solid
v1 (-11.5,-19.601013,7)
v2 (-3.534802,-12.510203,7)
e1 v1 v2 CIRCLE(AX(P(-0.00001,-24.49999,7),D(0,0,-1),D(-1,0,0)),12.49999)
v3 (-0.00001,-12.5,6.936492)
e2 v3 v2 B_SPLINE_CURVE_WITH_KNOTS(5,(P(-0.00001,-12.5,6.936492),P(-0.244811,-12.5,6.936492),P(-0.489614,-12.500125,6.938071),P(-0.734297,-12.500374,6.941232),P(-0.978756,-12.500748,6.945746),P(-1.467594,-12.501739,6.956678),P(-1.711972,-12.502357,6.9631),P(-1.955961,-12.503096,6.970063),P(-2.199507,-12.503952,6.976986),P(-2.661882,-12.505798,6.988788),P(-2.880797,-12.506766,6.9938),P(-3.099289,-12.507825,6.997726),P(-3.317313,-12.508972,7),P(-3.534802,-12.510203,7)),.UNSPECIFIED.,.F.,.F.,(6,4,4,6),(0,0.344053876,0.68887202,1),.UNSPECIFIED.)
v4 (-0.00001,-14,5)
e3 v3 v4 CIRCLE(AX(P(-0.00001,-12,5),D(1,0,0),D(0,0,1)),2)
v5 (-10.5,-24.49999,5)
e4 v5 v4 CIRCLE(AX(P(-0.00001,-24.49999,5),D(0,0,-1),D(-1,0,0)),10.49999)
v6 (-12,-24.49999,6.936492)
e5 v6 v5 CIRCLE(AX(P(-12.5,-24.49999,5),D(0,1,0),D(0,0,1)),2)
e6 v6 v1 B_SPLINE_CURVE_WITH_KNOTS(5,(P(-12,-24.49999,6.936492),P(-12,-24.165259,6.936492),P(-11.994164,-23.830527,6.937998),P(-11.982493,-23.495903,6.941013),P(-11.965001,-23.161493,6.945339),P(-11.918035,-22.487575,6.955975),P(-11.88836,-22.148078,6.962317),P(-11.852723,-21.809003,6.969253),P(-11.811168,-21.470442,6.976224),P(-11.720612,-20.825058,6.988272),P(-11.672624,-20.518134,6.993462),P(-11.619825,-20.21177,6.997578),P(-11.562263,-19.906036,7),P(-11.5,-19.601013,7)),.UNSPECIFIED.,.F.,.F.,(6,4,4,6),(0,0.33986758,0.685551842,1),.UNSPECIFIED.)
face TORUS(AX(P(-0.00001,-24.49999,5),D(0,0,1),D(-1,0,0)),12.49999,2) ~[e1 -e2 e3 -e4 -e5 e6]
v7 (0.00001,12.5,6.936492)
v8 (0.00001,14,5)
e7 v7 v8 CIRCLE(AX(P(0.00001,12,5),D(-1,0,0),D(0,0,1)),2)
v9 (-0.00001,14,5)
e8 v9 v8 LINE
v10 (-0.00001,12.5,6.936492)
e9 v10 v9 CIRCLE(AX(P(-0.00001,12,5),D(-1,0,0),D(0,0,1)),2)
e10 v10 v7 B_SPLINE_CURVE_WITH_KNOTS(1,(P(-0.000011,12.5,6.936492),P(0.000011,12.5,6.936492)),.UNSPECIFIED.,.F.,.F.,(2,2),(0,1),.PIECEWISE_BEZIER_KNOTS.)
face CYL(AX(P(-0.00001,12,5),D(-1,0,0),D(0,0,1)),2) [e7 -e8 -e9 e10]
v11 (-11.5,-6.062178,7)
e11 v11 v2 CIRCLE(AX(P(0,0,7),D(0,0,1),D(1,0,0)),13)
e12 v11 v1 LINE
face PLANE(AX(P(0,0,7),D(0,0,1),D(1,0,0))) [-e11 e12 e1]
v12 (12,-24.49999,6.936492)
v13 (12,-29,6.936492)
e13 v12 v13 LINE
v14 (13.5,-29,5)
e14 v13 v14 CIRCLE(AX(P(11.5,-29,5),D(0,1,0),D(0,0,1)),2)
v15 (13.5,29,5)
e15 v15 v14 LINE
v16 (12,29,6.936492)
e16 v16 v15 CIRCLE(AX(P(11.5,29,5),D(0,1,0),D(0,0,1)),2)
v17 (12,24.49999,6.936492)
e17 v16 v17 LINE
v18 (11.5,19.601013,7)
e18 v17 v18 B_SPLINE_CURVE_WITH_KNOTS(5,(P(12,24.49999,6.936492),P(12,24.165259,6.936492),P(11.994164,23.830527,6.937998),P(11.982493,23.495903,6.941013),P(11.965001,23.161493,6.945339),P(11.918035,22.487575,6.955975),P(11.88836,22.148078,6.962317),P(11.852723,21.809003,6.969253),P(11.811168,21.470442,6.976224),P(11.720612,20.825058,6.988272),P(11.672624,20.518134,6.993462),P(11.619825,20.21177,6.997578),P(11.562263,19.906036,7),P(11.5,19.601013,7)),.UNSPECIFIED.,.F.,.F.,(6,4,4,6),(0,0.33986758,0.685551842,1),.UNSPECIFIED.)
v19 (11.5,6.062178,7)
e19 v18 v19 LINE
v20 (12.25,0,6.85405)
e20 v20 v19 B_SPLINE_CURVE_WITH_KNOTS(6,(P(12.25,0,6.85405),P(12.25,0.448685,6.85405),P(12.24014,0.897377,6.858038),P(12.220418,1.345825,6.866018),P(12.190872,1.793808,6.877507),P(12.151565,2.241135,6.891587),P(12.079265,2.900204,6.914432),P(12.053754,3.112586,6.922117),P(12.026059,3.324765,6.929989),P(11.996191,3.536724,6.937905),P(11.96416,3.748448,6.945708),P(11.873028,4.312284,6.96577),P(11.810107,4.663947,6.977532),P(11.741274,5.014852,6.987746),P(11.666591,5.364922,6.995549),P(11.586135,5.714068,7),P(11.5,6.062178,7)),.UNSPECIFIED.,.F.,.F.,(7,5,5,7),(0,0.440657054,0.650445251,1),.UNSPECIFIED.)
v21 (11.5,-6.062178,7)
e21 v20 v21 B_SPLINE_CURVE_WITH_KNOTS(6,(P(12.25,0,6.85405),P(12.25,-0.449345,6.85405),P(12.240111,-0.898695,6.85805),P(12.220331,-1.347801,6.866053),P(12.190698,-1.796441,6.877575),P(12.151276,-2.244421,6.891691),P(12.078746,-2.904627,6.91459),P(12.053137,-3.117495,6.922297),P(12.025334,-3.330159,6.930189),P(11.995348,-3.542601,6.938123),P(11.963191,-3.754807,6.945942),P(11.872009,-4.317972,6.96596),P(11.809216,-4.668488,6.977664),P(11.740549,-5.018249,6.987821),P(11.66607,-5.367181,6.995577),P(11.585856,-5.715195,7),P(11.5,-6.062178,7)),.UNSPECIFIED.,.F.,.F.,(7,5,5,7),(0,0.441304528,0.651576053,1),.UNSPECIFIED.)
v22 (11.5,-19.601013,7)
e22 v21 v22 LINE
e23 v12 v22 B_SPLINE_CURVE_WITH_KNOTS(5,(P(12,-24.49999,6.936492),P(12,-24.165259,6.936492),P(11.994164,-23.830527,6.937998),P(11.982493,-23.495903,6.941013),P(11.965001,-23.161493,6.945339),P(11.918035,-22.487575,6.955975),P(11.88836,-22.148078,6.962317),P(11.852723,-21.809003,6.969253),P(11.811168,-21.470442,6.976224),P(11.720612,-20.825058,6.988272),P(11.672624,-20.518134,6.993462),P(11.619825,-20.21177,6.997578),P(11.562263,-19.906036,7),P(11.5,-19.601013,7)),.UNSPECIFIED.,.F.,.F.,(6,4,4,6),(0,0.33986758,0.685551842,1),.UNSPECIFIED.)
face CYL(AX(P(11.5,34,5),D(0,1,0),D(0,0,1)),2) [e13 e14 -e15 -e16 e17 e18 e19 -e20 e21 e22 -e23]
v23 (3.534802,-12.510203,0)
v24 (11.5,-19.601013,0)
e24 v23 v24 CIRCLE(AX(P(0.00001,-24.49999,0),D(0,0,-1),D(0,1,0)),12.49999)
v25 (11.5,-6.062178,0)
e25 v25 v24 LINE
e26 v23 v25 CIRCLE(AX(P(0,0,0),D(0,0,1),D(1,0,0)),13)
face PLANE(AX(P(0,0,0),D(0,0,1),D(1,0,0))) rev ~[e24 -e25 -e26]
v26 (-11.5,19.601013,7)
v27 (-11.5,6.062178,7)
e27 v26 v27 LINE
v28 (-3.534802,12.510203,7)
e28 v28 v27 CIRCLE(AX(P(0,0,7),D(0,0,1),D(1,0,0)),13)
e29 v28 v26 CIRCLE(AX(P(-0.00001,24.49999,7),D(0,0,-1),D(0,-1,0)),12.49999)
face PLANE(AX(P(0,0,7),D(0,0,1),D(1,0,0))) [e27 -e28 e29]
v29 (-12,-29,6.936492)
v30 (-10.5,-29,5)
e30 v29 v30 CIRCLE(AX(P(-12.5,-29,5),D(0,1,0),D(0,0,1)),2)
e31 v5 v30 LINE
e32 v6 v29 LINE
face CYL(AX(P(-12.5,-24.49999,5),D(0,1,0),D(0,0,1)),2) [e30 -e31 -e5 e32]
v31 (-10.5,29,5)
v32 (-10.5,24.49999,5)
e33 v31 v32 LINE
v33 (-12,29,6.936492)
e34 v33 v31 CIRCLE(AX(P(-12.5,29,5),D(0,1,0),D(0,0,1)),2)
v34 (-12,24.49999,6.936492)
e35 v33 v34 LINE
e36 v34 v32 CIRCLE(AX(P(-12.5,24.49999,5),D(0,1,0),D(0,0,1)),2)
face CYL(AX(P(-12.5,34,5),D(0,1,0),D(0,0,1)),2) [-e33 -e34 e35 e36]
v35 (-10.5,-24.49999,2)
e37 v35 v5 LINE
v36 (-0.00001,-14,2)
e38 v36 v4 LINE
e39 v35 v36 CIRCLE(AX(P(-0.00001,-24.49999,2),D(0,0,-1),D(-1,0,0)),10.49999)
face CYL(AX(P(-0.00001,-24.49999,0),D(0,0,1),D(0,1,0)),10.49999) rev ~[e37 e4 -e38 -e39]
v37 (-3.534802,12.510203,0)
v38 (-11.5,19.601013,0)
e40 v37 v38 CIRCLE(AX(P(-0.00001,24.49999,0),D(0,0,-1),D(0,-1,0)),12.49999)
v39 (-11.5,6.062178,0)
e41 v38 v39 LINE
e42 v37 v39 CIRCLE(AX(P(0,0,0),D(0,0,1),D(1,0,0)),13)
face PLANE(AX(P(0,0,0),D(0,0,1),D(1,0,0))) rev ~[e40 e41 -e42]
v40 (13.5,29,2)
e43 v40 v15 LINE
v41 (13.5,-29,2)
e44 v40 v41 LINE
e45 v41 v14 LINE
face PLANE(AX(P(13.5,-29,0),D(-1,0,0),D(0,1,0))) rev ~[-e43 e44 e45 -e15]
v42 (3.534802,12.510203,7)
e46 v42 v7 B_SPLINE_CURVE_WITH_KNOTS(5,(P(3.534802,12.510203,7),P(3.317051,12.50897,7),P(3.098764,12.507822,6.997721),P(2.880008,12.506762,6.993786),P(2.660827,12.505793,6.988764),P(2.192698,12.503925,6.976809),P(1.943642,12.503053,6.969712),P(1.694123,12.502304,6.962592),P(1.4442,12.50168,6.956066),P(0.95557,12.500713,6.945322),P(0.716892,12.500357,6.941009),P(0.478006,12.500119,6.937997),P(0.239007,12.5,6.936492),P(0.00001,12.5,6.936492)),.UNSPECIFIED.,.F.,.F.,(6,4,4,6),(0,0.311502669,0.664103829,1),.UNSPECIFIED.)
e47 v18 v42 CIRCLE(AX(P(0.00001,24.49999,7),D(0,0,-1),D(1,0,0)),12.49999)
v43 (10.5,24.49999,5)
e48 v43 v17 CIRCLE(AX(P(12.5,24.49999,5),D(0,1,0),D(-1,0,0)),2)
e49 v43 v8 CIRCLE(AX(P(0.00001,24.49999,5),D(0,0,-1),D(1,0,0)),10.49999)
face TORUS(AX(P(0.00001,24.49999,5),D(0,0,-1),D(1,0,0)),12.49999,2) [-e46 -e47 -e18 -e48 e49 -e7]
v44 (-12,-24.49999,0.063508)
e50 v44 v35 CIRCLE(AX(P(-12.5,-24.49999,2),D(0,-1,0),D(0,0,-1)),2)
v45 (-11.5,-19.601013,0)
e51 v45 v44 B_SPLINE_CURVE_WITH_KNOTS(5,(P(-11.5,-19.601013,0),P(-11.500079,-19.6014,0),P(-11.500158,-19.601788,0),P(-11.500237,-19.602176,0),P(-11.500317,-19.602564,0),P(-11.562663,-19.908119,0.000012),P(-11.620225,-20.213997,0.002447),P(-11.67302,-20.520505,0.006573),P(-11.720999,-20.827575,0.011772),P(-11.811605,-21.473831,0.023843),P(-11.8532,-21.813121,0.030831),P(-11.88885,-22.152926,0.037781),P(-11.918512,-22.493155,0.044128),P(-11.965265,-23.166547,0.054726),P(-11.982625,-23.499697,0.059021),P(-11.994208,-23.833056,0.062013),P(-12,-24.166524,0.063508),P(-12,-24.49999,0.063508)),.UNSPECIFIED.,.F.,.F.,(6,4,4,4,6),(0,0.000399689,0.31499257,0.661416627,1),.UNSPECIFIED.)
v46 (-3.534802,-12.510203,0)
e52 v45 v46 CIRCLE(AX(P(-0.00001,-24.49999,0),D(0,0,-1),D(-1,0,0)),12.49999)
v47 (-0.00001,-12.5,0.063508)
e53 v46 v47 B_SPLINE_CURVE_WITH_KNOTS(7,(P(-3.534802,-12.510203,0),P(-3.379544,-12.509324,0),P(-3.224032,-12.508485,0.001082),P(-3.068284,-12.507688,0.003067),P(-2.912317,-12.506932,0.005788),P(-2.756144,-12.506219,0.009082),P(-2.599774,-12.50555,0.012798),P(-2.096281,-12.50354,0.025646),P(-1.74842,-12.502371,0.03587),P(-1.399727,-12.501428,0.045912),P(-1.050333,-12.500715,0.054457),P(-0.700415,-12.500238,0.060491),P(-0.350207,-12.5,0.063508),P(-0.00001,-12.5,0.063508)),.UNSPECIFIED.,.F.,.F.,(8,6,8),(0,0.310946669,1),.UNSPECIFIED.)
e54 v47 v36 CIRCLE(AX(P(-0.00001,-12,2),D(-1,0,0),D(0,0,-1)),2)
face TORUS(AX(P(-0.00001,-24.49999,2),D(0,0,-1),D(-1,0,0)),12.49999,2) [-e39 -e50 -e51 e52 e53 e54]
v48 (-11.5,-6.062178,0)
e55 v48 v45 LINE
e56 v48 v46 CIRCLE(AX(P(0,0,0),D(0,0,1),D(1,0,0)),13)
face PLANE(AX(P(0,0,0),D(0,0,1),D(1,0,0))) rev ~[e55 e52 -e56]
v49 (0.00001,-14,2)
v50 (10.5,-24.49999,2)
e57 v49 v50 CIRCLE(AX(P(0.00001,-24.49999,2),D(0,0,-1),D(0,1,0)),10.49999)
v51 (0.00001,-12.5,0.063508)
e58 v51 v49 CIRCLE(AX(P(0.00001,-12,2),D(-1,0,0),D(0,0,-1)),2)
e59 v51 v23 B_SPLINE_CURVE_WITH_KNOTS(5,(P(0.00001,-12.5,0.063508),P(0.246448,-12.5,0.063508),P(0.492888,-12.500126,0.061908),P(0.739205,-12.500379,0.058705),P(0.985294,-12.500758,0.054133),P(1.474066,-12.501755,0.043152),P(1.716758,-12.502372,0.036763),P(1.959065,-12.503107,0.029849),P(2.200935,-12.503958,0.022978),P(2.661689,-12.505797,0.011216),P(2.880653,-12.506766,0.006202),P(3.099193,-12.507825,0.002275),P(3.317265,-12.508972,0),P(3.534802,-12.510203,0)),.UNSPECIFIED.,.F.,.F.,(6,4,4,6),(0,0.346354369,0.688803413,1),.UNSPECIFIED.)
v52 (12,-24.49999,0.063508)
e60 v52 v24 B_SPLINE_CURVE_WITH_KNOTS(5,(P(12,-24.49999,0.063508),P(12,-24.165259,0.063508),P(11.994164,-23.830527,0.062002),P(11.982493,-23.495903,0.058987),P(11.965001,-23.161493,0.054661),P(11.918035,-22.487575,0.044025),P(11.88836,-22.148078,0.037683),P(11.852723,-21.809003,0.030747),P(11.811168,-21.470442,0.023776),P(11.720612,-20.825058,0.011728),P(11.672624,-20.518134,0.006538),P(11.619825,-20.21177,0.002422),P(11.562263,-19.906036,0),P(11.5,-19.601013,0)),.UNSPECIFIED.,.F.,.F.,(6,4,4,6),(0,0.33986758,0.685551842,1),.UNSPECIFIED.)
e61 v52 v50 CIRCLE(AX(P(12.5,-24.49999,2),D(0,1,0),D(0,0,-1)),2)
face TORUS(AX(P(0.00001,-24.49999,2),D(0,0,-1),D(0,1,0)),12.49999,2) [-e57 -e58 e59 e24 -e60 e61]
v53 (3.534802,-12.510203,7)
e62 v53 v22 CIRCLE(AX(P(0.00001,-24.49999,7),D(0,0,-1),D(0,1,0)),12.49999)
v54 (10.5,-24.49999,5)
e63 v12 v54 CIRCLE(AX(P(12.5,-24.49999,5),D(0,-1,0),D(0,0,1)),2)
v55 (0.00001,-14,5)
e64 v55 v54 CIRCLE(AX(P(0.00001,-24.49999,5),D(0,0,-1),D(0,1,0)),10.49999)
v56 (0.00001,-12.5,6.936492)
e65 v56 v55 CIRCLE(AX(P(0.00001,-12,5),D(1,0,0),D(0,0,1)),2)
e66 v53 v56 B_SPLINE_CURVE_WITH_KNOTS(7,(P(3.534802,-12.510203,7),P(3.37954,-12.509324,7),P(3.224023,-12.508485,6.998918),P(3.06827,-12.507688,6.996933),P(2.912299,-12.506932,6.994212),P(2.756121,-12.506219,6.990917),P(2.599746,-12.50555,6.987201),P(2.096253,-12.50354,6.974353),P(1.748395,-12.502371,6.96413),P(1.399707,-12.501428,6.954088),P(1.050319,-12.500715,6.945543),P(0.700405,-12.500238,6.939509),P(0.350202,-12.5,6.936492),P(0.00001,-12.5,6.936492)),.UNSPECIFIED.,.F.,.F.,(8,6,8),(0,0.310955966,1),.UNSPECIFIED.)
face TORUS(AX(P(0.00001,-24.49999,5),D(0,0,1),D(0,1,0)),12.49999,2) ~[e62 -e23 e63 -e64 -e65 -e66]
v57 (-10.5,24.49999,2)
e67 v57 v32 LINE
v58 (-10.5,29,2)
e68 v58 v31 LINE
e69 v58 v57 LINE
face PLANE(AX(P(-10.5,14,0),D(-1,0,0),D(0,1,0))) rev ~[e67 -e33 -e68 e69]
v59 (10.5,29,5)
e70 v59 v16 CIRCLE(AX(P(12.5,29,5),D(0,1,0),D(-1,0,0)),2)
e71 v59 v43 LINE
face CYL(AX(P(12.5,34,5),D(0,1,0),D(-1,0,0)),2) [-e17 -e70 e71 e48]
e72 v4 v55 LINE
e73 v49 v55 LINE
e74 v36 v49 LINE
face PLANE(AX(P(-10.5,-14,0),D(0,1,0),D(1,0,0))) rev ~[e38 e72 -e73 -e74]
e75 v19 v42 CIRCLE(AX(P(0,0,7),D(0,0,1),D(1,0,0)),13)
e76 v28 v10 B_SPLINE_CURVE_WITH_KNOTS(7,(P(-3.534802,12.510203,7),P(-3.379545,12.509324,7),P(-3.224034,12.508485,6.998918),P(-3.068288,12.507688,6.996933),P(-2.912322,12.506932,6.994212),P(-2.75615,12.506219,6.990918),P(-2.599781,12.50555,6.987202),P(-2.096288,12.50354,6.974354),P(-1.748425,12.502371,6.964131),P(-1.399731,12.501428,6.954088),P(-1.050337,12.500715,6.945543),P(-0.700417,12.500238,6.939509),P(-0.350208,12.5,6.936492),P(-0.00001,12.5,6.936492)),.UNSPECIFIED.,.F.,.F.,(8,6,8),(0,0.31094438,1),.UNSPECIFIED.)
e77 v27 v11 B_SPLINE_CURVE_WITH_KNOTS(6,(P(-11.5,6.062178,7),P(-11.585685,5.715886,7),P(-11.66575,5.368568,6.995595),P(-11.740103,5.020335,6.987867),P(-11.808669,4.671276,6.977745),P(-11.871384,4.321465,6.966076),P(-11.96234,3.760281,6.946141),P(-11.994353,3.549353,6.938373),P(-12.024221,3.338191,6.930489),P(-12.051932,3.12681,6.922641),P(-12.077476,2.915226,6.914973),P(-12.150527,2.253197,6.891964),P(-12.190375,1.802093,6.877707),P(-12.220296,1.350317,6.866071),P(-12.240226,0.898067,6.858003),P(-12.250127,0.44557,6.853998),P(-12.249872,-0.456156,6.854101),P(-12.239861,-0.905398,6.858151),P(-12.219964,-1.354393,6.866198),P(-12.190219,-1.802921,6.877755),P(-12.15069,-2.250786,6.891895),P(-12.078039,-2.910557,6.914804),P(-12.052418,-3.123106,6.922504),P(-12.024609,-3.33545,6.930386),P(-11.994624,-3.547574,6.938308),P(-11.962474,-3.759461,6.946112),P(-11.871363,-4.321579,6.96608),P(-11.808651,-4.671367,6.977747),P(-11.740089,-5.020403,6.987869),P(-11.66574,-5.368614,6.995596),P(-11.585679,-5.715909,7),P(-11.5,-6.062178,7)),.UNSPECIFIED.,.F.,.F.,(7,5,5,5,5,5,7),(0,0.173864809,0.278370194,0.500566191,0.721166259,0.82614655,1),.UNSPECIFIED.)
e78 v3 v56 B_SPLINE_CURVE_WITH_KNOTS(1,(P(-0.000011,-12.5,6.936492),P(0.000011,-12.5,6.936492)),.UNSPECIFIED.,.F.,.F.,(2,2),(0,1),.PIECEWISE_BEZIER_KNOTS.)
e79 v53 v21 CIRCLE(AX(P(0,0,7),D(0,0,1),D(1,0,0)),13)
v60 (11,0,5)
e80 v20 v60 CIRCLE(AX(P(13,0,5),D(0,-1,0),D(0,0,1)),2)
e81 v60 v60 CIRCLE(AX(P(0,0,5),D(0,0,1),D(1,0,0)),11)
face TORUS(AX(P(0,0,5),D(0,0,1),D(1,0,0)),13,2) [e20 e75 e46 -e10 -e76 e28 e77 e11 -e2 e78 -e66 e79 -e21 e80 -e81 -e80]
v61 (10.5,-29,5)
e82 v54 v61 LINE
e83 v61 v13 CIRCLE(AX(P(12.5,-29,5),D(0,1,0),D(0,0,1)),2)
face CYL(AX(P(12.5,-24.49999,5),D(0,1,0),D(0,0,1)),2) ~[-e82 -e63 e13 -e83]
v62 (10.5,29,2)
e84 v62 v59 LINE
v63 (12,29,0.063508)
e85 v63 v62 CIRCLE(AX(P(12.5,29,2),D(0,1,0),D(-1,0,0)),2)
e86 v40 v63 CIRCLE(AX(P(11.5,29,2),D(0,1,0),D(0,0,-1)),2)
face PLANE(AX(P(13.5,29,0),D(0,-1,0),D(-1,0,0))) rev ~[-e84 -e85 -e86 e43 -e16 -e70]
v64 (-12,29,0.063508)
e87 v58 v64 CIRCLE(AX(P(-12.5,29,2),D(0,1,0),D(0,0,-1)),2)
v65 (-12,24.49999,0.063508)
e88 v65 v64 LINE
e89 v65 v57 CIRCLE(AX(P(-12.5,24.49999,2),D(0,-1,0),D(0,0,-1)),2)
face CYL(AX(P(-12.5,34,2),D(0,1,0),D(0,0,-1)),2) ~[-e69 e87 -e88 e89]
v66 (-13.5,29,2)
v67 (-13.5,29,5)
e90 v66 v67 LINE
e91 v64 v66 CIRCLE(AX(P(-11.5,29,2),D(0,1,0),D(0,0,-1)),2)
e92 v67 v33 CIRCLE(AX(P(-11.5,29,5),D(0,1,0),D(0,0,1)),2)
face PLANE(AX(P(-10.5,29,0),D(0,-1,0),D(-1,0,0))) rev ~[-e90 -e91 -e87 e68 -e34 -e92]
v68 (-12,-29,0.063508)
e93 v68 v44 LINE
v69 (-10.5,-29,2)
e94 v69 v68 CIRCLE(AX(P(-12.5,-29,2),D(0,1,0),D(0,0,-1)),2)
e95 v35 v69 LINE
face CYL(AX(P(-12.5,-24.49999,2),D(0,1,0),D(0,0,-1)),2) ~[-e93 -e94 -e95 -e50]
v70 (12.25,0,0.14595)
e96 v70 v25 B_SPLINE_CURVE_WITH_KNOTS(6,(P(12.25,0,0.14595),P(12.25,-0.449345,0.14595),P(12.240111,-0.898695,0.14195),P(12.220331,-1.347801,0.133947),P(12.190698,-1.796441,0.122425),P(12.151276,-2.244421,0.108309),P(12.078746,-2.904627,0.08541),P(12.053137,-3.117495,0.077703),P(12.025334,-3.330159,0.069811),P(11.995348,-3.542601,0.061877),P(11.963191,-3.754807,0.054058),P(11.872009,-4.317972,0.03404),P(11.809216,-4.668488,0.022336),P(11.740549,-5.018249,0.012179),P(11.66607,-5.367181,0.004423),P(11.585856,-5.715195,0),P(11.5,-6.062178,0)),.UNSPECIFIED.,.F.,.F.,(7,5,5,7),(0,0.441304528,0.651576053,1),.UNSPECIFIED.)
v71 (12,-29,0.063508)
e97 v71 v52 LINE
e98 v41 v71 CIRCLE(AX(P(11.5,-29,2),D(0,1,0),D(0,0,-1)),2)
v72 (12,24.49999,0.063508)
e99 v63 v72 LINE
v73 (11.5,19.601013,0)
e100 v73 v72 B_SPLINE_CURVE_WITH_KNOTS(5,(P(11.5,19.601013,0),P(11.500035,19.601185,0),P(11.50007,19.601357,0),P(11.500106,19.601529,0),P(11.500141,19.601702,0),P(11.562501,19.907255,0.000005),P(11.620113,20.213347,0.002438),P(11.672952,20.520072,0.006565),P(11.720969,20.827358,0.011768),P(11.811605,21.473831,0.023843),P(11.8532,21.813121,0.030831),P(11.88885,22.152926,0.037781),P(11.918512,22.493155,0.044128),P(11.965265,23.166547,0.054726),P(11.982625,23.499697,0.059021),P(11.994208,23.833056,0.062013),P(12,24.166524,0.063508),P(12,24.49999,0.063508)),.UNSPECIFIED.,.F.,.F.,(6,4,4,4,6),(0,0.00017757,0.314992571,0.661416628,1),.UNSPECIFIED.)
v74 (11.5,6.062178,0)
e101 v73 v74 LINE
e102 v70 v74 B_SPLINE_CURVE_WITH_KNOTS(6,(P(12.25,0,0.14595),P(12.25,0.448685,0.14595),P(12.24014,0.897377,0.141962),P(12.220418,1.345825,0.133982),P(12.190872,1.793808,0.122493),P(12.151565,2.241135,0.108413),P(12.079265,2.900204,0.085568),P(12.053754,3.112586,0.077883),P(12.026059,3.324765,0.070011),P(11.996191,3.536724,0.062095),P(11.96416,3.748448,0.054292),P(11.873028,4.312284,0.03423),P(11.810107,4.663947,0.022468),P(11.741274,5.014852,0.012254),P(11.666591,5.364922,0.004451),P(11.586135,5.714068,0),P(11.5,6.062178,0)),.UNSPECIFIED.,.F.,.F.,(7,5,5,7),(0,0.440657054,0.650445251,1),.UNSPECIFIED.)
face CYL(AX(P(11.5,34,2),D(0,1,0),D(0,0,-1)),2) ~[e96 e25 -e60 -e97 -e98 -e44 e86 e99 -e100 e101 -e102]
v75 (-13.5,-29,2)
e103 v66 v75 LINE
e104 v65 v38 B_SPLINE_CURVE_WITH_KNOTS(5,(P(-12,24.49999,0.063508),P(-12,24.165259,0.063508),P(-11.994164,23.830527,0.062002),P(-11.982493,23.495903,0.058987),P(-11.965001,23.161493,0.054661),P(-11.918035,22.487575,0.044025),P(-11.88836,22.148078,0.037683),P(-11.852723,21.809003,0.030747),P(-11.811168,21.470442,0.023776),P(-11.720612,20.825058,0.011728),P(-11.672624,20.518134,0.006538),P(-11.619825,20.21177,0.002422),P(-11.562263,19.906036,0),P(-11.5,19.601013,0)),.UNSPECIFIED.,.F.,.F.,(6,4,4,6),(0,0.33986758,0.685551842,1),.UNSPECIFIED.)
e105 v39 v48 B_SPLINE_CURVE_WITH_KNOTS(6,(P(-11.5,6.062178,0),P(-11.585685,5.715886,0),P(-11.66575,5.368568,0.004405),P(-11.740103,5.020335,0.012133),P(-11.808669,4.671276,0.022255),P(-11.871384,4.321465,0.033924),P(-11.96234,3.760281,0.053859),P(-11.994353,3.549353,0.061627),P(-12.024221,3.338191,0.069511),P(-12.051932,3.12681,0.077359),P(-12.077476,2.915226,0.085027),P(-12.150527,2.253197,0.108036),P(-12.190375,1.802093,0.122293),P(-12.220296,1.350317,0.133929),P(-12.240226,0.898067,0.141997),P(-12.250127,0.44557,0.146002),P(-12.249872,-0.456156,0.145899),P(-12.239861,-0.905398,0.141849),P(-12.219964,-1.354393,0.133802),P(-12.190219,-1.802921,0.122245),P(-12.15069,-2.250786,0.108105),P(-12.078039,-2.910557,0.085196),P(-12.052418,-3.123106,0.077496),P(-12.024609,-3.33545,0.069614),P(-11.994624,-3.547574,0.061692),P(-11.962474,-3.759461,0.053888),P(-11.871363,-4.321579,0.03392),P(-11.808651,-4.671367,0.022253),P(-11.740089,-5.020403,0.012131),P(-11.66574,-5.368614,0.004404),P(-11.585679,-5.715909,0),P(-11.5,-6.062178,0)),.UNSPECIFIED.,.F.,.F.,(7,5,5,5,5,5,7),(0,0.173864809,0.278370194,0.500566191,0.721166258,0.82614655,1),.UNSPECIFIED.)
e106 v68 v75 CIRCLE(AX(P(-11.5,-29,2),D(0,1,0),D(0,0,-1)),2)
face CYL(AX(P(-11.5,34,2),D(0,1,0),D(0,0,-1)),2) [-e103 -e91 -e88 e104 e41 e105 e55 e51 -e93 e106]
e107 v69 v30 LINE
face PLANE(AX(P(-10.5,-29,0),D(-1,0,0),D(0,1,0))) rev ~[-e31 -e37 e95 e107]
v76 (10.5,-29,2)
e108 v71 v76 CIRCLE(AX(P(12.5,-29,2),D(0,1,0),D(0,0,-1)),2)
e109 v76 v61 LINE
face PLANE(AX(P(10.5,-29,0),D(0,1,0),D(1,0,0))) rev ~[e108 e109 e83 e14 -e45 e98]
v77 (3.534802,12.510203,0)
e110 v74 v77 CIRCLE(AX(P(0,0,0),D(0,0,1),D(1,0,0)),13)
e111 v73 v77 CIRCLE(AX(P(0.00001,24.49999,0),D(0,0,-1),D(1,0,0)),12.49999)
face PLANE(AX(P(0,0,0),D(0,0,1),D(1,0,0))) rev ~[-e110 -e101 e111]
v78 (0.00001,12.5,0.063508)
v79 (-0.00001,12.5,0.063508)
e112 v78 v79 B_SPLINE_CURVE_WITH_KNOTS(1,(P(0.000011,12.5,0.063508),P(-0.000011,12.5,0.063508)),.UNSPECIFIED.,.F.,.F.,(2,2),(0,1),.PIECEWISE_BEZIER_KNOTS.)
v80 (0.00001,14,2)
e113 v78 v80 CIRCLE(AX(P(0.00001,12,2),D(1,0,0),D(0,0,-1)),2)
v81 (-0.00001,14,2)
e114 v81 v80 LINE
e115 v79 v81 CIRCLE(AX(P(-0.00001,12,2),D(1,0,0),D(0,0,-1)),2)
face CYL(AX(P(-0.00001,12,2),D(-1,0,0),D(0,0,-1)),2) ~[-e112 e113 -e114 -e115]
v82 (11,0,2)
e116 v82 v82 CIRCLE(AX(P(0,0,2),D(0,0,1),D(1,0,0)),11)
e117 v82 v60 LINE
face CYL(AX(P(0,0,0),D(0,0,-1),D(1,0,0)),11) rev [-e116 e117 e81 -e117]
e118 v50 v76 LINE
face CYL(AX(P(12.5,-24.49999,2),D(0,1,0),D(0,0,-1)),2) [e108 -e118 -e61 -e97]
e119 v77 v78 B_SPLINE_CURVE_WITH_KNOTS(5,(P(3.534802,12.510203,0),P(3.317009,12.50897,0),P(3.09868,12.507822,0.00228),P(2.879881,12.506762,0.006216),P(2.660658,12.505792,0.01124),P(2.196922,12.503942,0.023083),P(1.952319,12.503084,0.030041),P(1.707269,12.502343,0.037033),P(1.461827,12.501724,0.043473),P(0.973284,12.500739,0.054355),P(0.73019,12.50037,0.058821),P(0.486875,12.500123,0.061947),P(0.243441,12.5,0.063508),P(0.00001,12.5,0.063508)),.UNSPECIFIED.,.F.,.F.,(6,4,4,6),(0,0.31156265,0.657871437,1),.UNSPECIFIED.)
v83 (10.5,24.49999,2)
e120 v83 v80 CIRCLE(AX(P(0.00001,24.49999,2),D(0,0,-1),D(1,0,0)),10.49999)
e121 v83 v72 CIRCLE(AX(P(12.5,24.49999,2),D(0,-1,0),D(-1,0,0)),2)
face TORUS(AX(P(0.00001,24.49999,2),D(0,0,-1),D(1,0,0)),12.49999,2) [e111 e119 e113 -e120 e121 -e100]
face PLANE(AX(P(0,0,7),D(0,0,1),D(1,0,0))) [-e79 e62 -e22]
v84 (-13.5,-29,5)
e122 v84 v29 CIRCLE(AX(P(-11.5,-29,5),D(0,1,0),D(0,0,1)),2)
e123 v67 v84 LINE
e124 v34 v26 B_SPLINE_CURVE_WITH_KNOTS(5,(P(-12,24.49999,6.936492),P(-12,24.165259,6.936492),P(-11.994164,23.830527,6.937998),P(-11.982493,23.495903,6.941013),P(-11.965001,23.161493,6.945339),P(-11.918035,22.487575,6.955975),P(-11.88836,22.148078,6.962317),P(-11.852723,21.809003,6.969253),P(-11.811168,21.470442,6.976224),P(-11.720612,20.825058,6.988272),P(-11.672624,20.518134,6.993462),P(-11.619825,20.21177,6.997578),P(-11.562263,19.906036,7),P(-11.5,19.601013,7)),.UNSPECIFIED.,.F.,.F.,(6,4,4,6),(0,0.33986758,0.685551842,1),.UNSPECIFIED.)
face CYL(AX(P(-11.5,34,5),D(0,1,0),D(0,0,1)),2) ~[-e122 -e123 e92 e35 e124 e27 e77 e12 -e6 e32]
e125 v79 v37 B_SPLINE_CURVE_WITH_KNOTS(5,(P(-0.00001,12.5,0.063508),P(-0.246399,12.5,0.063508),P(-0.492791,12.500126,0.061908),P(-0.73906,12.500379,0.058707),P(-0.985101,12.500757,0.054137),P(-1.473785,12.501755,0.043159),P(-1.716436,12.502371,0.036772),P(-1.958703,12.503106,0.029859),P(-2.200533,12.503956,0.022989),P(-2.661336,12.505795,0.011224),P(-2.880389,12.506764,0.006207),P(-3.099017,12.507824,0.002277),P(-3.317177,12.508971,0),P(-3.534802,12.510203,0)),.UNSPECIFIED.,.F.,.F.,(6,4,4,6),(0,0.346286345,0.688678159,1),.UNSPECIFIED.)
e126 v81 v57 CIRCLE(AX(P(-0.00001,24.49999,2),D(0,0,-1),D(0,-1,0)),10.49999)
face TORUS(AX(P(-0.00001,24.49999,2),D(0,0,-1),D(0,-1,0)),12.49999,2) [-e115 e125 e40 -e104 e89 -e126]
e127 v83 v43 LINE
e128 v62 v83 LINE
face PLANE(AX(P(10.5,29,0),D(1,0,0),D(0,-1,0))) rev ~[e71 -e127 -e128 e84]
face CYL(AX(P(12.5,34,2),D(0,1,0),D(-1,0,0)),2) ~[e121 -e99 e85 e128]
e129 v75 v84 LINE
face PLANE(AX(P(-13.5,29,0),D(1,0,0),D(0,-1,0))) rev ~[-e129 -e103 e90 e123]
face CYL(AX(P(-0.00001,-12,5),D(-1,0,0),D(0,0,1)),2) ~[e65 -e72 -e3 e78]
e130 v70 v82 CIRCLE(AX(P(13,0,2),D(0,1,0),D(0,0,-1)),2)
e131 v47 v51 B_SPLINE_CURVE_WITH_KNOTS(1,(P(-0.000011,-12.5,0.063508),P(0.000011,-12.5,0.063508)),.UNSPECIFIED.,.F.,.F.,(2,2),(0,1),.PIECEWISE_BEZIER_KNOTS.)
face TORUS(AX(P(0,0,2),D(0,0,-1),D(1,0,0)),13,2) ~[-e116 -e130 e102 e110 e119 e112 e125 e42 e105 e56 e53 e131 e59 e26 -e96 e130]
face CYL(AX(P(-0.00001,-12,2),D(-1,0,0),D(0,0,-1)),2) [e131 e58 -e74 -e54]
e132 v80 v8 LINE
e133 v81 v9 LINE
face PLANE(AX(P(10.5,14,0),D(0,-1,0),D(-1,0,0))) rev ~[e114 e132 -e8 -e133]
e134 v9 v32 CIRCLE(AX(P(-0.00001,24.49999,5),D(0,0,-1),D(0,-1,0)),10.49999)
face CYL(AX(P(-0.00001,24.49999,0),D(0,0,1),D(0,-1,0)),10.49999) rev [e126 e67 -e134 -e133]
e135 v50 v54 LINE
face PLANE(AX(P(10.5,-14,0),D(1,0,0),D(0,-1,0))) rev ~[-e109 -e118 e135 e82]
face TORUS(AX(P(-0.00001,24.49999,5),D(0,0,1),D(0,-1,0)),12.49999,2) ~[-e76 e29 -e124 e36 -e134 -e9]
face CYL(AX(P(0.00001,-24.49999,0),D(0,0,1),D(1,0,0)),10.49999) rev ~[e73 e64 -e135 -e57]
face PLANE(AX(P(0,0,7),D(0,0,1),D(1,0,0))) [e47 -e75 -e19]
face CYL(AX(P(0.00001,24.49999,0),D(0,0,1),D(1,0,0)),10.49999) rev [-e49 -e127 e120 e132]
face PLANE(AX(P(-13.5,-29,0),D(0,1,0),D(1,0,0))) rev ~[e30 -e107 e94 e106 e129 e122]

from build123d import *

# Parameters (mm, degrees)
F0_R          = 11
F1_DEPTH      = 7
F2_R          = 10.49999
F3_T1_DEPTH   = 9.50001
F3_T3_DEPTH   = 2e-05
F3_T5_DEPTH   = 68
F3_T7_DEPTH   = 9.50001
F3_T10_ANGLE  = 90
F3_T14_DEPTH  = 13
F3_S15_R      = 2
F3_T16_DEPTH  = 8
F3_T20_DEPTH  = 13
F3_S21_R      = 2
F3_T22_DEPTH  = 8
F3_T24_ANGLE  = 90
F3_T28_DEPTH  = 13
F3_S29_R      = 2
F3_T30_DEPTH  = 8
F3_T34_DEPTH  = 13
F3_S35_R      = 2
F3_T36_DEPTH  = 8
F3_T40_DEPTH  = 13
F3_S41_R      = 2
F3_T42_DEPTH  = 8
F3_T46_DEPTH  = 13
F3_S47_R      = 2
F3_T48_DEPTH  = 8
F3_T50_ANGLE  = 90
F3_T54_DEPTH  = 13
F3_S55_R      = 2
F3_T56_DEPTH  = 8
F3_T60_DEPTH  = 13
F3_S61_R      = 2
F3_T62_DEPTH  = 8
F3_T64_ANGLE  = 90
F3_T68_ANGLE  = 90
F3_T72_DEPTH  = 13
F3_S73_R      = 2
F3_T74_DEPTH  = 8
F3_T78_DEPTH  = 13
F3_S79_R      = 2
F3_T80_DEPTH  = 8
F3_T82_ANGLE  = 90
F3_T86_DEPTH  = 13
F3_S87_R      = 2
F3_T88_DEPTH  = 8
F3_T92_DEPTH  = 13
F3_S93_R      = 2
F3_T94_DEPTH  = 8
F3_T98_DEPTH  = 13
F3_S99_R      = 2
F3_T100_DEPTH = 8
F3_T104_DEPTH = 13
F3_S105_R     = 2
F3_T106_DEPTH = 8
F3_T108_ANGLE = 90
F3_T112_DEPTH = 13
F3_S113_R     = 2
F3_T114_DEPTH = 8
F3_T118_DEPTH = 13
F3_S119_R     = 2
F3_T120_DEPTH = 8
F3_T122_ANGLE = 90


# Not quite as in the source:
# - a fillet or chamfer that OpenCascade refuses, or shapes differently, is made with other operations: its cross-section is extruded or revolved along the edge and cut away or added
# - a fillet or chamfer is up to 0.001 mm smaller than in the source, because OpenCascade refuses the exact size


with BuildPart() as f1:
    # F0 (on Top) → F1 (new body)
    with BuildSketch(Plane.XY):
        Polygon((13.5, -29), (13.5, 29), (10.5, 29), (10.5, 14), (-10.5, 14), (-10.5, 29), (-13.5, 29), (-13.5, -29), (-10.5, -29), (-10.5, -14), (10.5, -14), (10.5, -29), align=None)
        Circle(F0_R, mode=Mode.SUBTRACT)
    extrude(amount=F1_DEPTH)

    # F2 (radius 10.5 in the source; OpenCascade refuses exactly that, so slightly less here)
    f2_edges = [f1.edges().sort_by_distance(p)[0] for p in [
        (-10.5, -14, 3.5),
        (10.5, -14, 3.5),
        (-10.5, 14, 3.5),
        (10.5, 14, 3.5),
    ]]
    fillet(f2_edges, radius=F2_R)

    # F3: fillet of radius 2 on 34 edges, made by hand

    # F3_s2 → F3_t1 (cut)
    with BuildSketch(Plane.XZ.offset(-34)):
        with BuildLine():
            ThreePointArc((10.5, 5), (11.0857864376, 6.4142135624), (12.5, 7))
            Line((12.5, 7), (10.5, 7))
            Line((10.5, 7), (10.5, 5))
        make_face()
        with BuildLine():
            ThreePointArc((-12.5, 7), (-11.0857864376, 6.4142135624), (-10.5, 5))
            Line((-10.5, 5), (-10.5, 7))
            Line((-10.5, 7), (-12.5, 7))
        make_face()
        with BuildLine():
            ThreePointArc((10.5, 2), (11.0857864376, 0.5857864376), (12.5, 0))
            Line((12.5, 0), (10.5, 0))
            Line((10.5, 0), (10.5, 2))
        make_face()
        with BuildLine():
            ThreePointArc((-12.5, 0), (-11.0857864376, 0.5857864376), (-10.5, 2))
            Line((-10.5, 2), (-10.5, 0))
            Line((-10.5, 0), (-12.5, 0))
        make_face()
    extrude(amount=F3_T1_DEPTH, mode=Mode.SUBTRACT)

    # F3_s4 → F3_t3 (cut)
    with BuildSketch(Plane.YZ.offset(-1e-05)):
        with BuildLine():
            ThreePointArc((12, 7), (13.4142135624, 6.4142135624), (14, 5))
            Line((14, 5), (14, 7))
            Line((14, 7), (12, 7))
        make_face()
        with BuildLine():
            ThreePointArc((-12, 7), (-13.4142135624, 6.4142135624), (-14, 5))
            Line((-14, 5), (-14, 7))
            Line((-14, 7), (-12, 7))
        make_face()
        with BuildLine():
            ThreePointArc((12, 0), (13.4142135624, 0.5857864376), (14, 2))
            Line((14, 2), (14, 0))
            Line((14, 0), (12, 0))
        make_face()
        with BuildLine():
            ThreePointArc((-12, 0), (-13.4142135624, 0.5857864376), (-14, 2))
            Line((-14, 2), (-14, 0))
            Line((-14, 0), (-12, 0))
        make_face()
    extrude(amount=F3_T3_DEPTH, mode=Mode.SUBTRACT)

    # F3_s6 → F3_t5 (cut)
    with BuildSketch(Plane.XZ.offset(-34)):
        with BuildLine():
            ThreePointArc((11.5, 7), (12.9142135624, 6.4142135624), (13.5, 5))
            Line((13.5, 5), (13.5, 7))
            Line((13.5, 7), (11.5, 7))
        make_face()
        with BuildLine():
            ThreePointArc((-11.5, 7), (-12.9142135624, 6.4142135624), (-13.5, 5))
            Line((-13.5, 5), (-13.5, 7))
            Line((-13.5, 7), (-11.5, 7))
        make_face()
        with BuildLine():
            ThreePointArc((11.5, 0), (12.9142135624, 0.5857864376), (13.5, 2))
            Line((13.5, 2), (13.5, 0))
            Line((13.5, 0), (11.5, 0))
        make_face()
        with BuildLine():
            ThreePointArc((-11.5, 0), (-12.9142135624, 0.5857864376), (-13.5, 2))
            Line((-13.5, 2), (-13.5, 0))
            Line((-13.5, 0), (-11.5, 0))
        make_face()
    extrude(amount=F3_T5_DEPTH, mode=Mode.SUBTRACT)

    # F3_s8 → F3_t7 (cut)
    with BuildSketch(Plane.XZ.offset(24.49999)):
        with BuildLine():
            ThreePointArc((12.5, 7), (11.0857864376, 6.4142135624), (10.5, 5))
            Line((10.5, 5), (10.5, 7))
            Line((10.5, 7), (12.5, 7))
        make_face()
        with BuildLine():
            ThreePointArc((-12.5, 7), (-11.0857864376, 6.4142135624), (-10.5, 5))
            Line((-10.5, 5), (-10.5, 7))
            Line((-10.5, 7), (-12.5, 7))
        make_face()
        with BuildLine():
            ThreePointArc((12.5, 0), (11.0857864376, 0.5857864376), (10.5, 2))
            Line((10.5, 2), (10.5, 0))
            Line((10.5, 0), (12.5, 0))
        make_face()
        with BuildLine():
            ThreePointArc((-12.5, 0), (-11.0857864376, 0.5857864376), (-10.5, 2))
            Line((-10.5, 2), (-10.5, 0))
            Line((-10.5, 0), (-12.5, 0))
        make_face()
    extrude(amount=F3_T7_DEPTH, mode=Mode.SUBTRACT)

    # F3_s9 → F3_t10 (revolve, cut)
    with BuildSketch(Plane.XZ.offset(-24.49999)):
        with BuildLine():
            ThreePointArc((10.5, 5), (11.0857864376, 6.4142135624), (12.5, 7))
            Line((12.5, 7), (10.5, 7))
            Line((10.5, 7), (10.5, 5))
        make_face()
    revolve(axis=Axis((1e-05, 24.49999, 7), (0, 0, -1)), revolution_arc=F3_T10_ANGLE, mode=Mode.SUBTRACT)


with BuildPart() as f3_tool12:
    # F3_s13 → F3_t14 (new body)
    with BuildSketch(Plane.YZ.offset(18.5)):
        with BuildLine():
            ThreePointArc((29, 5), (28.4142135624, 6.4142135624), (27, 7))
            Line((27, 7), (29, 7))
            Line((29, 7), (29, 5))
        make_face()
    extrude(amount=-F3_T14_DEPTH)

    # F3_s15 → F3_t16 (cut, symmetric)
    with BuildSketch(Plane.XZ.offset(-28)):
        with Locations((12.5, 5)):
            Circle(F3_S15_R)
    extrude(amount=F3_T16_DEPTH, both=True, mode=Mode.SUBTRACT)


with BuildPart() as f1_1:
    add(f1.part)

    # F3_t11: cut F3_tool12
    add(f3_tool12.part, mode=Mode.SUBTRACT)


with BuildPart() as f3_tool18:
    # F3_s19 → F3_t20 (new body)
    with BuildSketch(Plane.YZ.offset(18.5)):
        with BuildLine():
            ThreePointArc((29, 5), (28.4142135624, 6.4142135624), (27, 7))
            Line((27, 7), (29, 7))
            Line((29, 7), (29, 5))
        make_face()
    extrude(amount=-F3_T20_DEPTH)

    # F3_s21 → F3_t22 (cut, symmetric)
    with BuildSketch(Plane.XZ.offset(-28)):
        with Locations((11.5, 5)):
            Circle(F3_S21_R)
    extrude(amount=F3_T22_DEPTH, both=True, mode=Mode.SUBTRACT)


with BuildPart() as f1_2:
    add(f1_1.part)

    # F3_t17: cut F3_tool18
    add(f3_tool18.part, mode=Mode.SUBTRACT)

    # F3_s23 → F3_t24 (revolve, cut)
    with BuildSketch(Plane.YZ.offset(-1e-05)):
        with BuildLine():
            ThreePointArc((12, 7), (13.4142135624, 6.4142135624), (14, 5))
            Line((14, 5), (14, 7))
            Line((14, 7), (12, 7))
        make_face()
    revolve(axis=Axis((-1e-05, 24.49999, 7), (0, 0, -1)), revolution_arc=F3_T24_ANGLE, mode=Mode.SUBTRACT)


with BuildPart() as f3_tool26:
    # F3_s27 → F3_t28 (new body)
    with BuildSketch(Plane.YZ.offset(5.5)):
        with BuildLine():
            ThreePointArc((-27, 7), (-28.4142135624, 6.4142135624), (-29, 5))
            Line((-29, 5), (-29, 7))
            Line((-29, 7), (-27, 7))
        make_face()
    extrude(amount=F3_T28_DEPTH)

    # F3_s29 → F3_t30 (cut, symmetric)
    with BuildSketch(Plane.XZ.offset(28)):
        with Locations((12.5, 5)):
            Circle(F3_S29_R)
    extrude(amount=F3_T30_DEPTH, both=True, mode=Mode.SUBTRACT)


with BuildPart() as f1_3:
    add(f1_2.part)

    # F3_t25: cut F3_tool26
    add(f3_tool26.part, mode=Mode.SUBTRACT)


with BuildPart() as f3_tool32:
    # F3_s33 → F3_t34 (new body)
    with BuildSketch(Plane.YZ.offset(5.5)):
        with BuildLine():
            ThreePointArc((-27, 7), (-28.4142135624, 6.4142135624), (-29, 5))
            Line((-29, 5), (-29, 7))
            Line((-29, 7), (-27, 7))
        make_face()
    extrude(amount=F3_T34_DEPTH)

    # F3_s35 → F3_t36 (cut, symmetric)
    with BuildSketch(Plane.XZ.offset(28)):
        with Locations((11.5, 5)):
            Circle(F3_S35_R)
    extrude(amount=F3_T36_DEPTH, both=True, mode=Mode.SUBTRACT)


with BuildPart() as f1_4:
    add(f1_3.part)

    # F3_t31: cut F3_tool32
    add(f3_tool32.part, mode=Mode.SUBTRACT)


with BuildPart() as f3_tool38:
    # F3_s39 → F3_t40 (new body)
    with BuildSketch(Plane.YZ.offset(-5.5)):
        with BuildLine():
            ThreePointArc((27, 7), (28.4142135624, 6.4142135624), (29, 5))
            Line((29, 5), (29, 7))
            Line((29, 7), (27, 7))
        make_face()
    extrude(amount=-F3_T40_DEPTH)

    # F3_s41 → F3_t42 (cut, symmetric)
    with BuildSketch(Plane.XZ.offset(-28)):
        with Locations((-12.5, 5)):
            Circle(F3_S41_R)
    extrude(amount=F3_T42_DEPTH, both=True, mode=Mode.SUBTRACT)


with BuildPart() as f1_5:
    add(f1_4.part)

    # F3_t37: cut F3_tool38
    add(f3_tool38.part, mode=Mode.SUBTRACT)


with BuildPart() as f3_tool44:
    # F3_s45 → F3_t46 (new body)
    with BuildSketch(Plane.YZ.offset(-5.5)):
        with BuildLine():
            ThreePointArc((27, 7), (28.4142135624, 6.4142135624), (29, 5))
            Line((29, 5), (29, 7))
            Line((29, 7), (27, 7))
        make_face()
    extrude(amount=-F3_T46_DEPTH)

    # F3_s47 → F3_t48 (cut, symmetric)
    with BuildSketch(Plane.XZ.offset(-28)):
        with Locations((-11.5, 5)):
            Circle(F3_S47_R)
    extrude(amount=F3_T48_DEPTH, both=True, mode=Mode.SUBTRACT)


with BuildPart() as f1_6:
    add(f1_5.part)

    # F3_t43: cut F3_tool44
    add(f3_tool44.part, mode=Mode.SUBTRACT)

    # F3_s49 → F3_t50 (revolve, cut)
    with BuildSketch(Plane.YZ.offset(1e-05)):
        with BuildLine():
            ThreePointArc((-12, 7), (-13.4142135624, 6.4142135624), (-14, 5))
            Line((-14, 5), (-14, 7))
            Line((-14, 7), (-12, 7))
        make_face()
    revolve(axis=Axis((1e-05, -24.49999, 7), (0, 0, -1)), revolution_arc=F3_T50_ANGLE, mode=Mode.SUBTRACT)


with BuildPart() as f3_tool52:
    # F3_s53 → F3_t54 (new body)
    with BuildSketch(Plane.YZ.offset(-18.5)):
        with BuildLine():
            ThreePointArc((-27, 7), (-28.4142135624, 6.4142135624), (-29, 5))
            Line((-29, 5), (-29, 7))
            Line((-29, 7), (-27, 7))
        make_face()
    extrude(amount=F3_T54_DEPTH)

    # F3_s55 → F3_t56 (cut, symmetric)
    with BuildSketch(Plane.XZ.offset(28)):
        with Locations((-12.5, 5)):
            Circle(F3_S55_R)
    extrude(amount=F3_T56_DEPTH, both=True, mode=Mode.SUBTRACT)


with BuildPart() as f1_7:
    add(f1_6.part)

    # F3_t51: cut F3_tool52
    add(f3_tool52.part, mode=Mode.SUBTRACT)


with BuildPart() as f3_tool58:
    # F3_s59 → F3_t60 (new body)
    with BuildSketch(Plane.YZ.offset(-18.5)):
        with BuildLine():
            ThreePointArc((-27, 7), (-28.4142135624, 6.4142135624), (-29, 5))
            Line((-29, 5), (-29, 7))
            Line((-29, 7), (-27, 7))
        make_face()
    extrude(amount=F3_T60_DEPTH)

    # F3_s61 → F3_t62 (cut, symmetric)
    with BuildSketch(Plane.XZ.offset(28)):
        with Locations((-11.5, 5)):
            Circle(F3_S61_R)
    extrude(amount=F3_T62_DEPTH, both=True, mode=Mode.SUBTRACT)


with BuildPart() as f1_8:
    add(f1_7.part)

    # F3_t57: cut F3_tool58
    add(f3_tool58.part, mode=Mode.SUBTRACT)

    # F3_s63 → F3_t64 (revolve, cut)
    with BuildSketch(Plane.XZ.offset(24.49999)):
        with BuildLine():
            ThreePointArc((-12.5, 7), (-11.0857864376, 6.4142135624), (-10.5, 5))
            Line((-10.5, 5), (-10.5, 7))
            Line((-10.5, 7), (-12.5, 7))
        make_face()
    revolve(axis=Axis((-1e-05, -24.49999, 7), (0, 0, -1)), revolution_arc=F3_T64_ANGLE, mode=Mode.SUBTRACT)

    # F3_s65 → F3_t66 (revolve, cut)
    with BuildSketch(Plane.XZ):
        with BuildLine():
            ThreePointArc((13, 7), (11.5857864376, 6.4142135624), (11, 5))
            Line((11, 5), (11, 7))
            Line((11, 7), (13, 7))
        make_face()
    revolve(axis=Axis((0, 0, 7), (0, 0, 1)), mode=Mode.SUBTRACT)

    # F3_s67 → F3_t68 (revolve, cut)
    with BuildSketch(Plane.XZ.offset(-24.49999)):
        with BuildLine():
            ThreePointArc((12.5, 0), (11.0857864376, 0.5857864376), (10.5, 2))
            Line((10.5, 2), (10.5, 0))
            Line((10.5, 0), (12.5, 0))
        make_face()
    revolve(axis=Axis((1e-05, 24.49999, 0), (0, 0, -1)), revolution_arc=F3_T68_ANGLE, mode=Mode.SUBTRACT)


with BuildPart() as f3_tool70:
    # F3_s71 → F3_t72 (new body)
    with BuildSketch(Plane.YZ.offset(18.5)):
        with BuildLine():
            ThreePointArc((27, 0), (28.4142135624, 0.5857864376), (29, 2))
            Line((29, 2), (29, 0))
            Line((29, 0), (27, 0))
        make_face()
    extrude(amount=-F3_T72_DEPTH)

    # F3_s73 → F3_t74 (cut, symmetric)
    with BuildSketch(Plane.XZ.offset(-28)):
        with Locations((11.5, 2)):
            Circle(F3_S73_R)
    extrude(amount=F3_T74_DEPTH, both=True, mode=Mode.SUBTRACT)


with BuildPart() as f1_9:
    add(f1_8.part)

    # F3_t69: cut F3_tool70
    add(f3_tool70.part, mode=Mode.SUBTRACT)


with BuildPart() as f3_tool76:
    # F3_s77 → F3_t78 (new body)
    with BuildSketch(Plane.YZ.offset(18.5)):
        with BuildLine():
            ThreePointArc((27, 0), (28.4142135624, 0.5857864376), (29, 2))
            Line((29, 2), (29, 0))
            Line((29, 0), (27, 0))
        make_face()
    extrude(amount=-F3_T78_DEPTH)

    # F3_s79 → F3_t80 (cut, symmetric)
    with BuildSketch(Plane.XZ.offset(-28)):
        with Locations((12.5, 2)):
            Circle(F3_S79_R)
    extrude(amount=F3_T80_DEPTH, both=True, mode=Mode.SUBTRACT)


with BuildPart() as f1_10:
    add(f1_9.part)

    # F3_t75: cut F3_tool76
    add(f3_tool76.part, mode=Mode.SUBTRACT)

    # F3_s81 → F3_t82 (revolve, cut)
    with BuildSketch(Plane.YZ.offset(-1e-05)):
        with BuildLine():
            ThreePointArc((12, 0), (13.4142135624, 0.5857864376), (14, 2))
            Line((14, 2), (14, 0))
            Line((14, 0), (12, 0))
        make_face()
    revolve(axis=Axis((-1e-05, 24.49999, 0), (0, 0, -1)), revolution_arc=F3_T82_ANGLE, mode=Mode.SUBTRACT)


with BuildPart() as f3_tool84:
    # F3_s85 → F3_t86 (new body)
    with BuildSketch(Plane.YZ.offset(5.5)):
        with BuildLine():
            ThreePointArc((-27, 0), (-28.4142135624, 0.5857864376), (-29, 2))
            Line((-29, 2), (-29, 0))
            Line((-29, 0), (-27, 0))
        make_face()
    extrude(amount=F3_T86_DEPTH)

    # F3_s87 → F3_t88 (cut, symmetric)
    with BuildSketch(Plane.XZ.offset(28)):
        with Locations((11.5, 2)):
            Circle(F3_S87_R)
    extrude(amount=F3_T88_DEPTH, both=True, mode=Mode.SUBTRACT)


with BuildPart() as f1_11:
    add(f1_10.part)

    # F3_t83: cut F3_tool84
    add(f3_tool84.part, mode=Mode.SUBTRACT)


with BuildPart() as f3_tool90:
    # F3_s91 → F3_t92 (new body)
    with BuildSketch(Plane.YZ.offset(5.5)):
        with BuildLine():
            ThreePointArc((-27, 0), (-28.4142135624, 0.5857864376), (-29, 2))
            Line((-29, 2), (-29, 0))
            Line((-29, 0), (-27, 0))
        make_face()
    extrude(amount=F3_T92_DEPTH)

    # F3_s93 → F3_t94 (cut, symmetric)
    with BuildSketch(Plane.XZ.offset(28)):
        with Locations((12.5, 2)):
            Circle(F3_S93_R)
    extrude(amount=F3_T94_DEPTH, both=True, mode=Mode.SUBTRACT)


with BuildPart() as f1_12:
    add(f1_11.part)

    # F3_t89: cut F3_tool90
    add(f3_tool90.part, mode=Mode.SUBTRACT)


with BuildPart() as f3_tool96:
    # F3_s97 → F3_t98 (new body)
    with BuildSketch(Plane.YZ.offset(-5.5)):
        with BuildLine():
            ThreePointArc((27, 0), (28.4142135624, 0.5857864376), (29, 2))
            Line((29, 2), (29, 0))
            Line((29, 0), (27, 0))
        make_face()
    extrude(amount=-F3_T98_DEPTH)

    # F3_s99 → F3_t100 (cut, symmetric)
    with BuildSketch(Plane.XZ.offset(-28)):
        with Locations((-11.5, 2)):
            Circle(F3_S99_R)
    extrude(amount=F3_T100_DEPTH, both=True, mode=Mode.SUBTRACT)


with BuildPart() as f1_13:
    add(f1_12.part)

    # F3_t95: cut F3_tool96
    add(f3_tool96.part, mode=Mode.SUBTRACT)


with BuildPart() as f3_tool102:
    # F3_s103 → F3_t104 (new body)
    with BuildSketch(Plane.YZ.offset(-5.5)):
        with BuildLine():
            ThreePointArc((27, 0), (28.4142135624, 0.5857864376), (29, 2))
            Line((29, 2), (29, 0))
            Line((29, 0), (27, 0))
        make_face()
    extrude(amount=-F3_T104_DEPTH)

    # F3_s105 → F3_t106 (cut, symmetric)
    with BuildSketch(Plane.XZ.offset(-28)):
        with Locations((-12.5, 2)):
            Circle(F3_S105_R)
    extrude(amount=F3_T106_DEPTH, both=True, mode=Mode.SUBTRACT)


with BuildPart() as f1_14:
    add(f1_13.part)

    # F3_t101: cut F3_tool102
    add(f3_tool102.part, mode=Mode.SUBTRACT)

    # F3_s107 → F3_t108 (revolve, cut)
    with BuildSketch(Plane.YZ.offset(1e-05)):
        with BuildLine():
            ThreePointArc((-12, 0), (-13.4142135624, 0.5857864376), (-14, 2))
            Line((-14, 2), (-14, 0))
            Line((-14, 0), (-12, 0))
        make_face()
    revolve(axis=Axis((1e-05, -24.49999, 0), (0, 0, -1)), revolution_arc=F3_T108_ANGLE, mode=Mode.SUBTRACT)


with BuildPart() as f3_tool110:
    # F3_s111 → F3_t112 (new body)
    with BuildSketch(Plane.YZ.offset(-18.5)):
        with BuildLine():
            ThreePointArc((-27, 0), (-28.4142135624, 0.5857864376), (-29, 2))
            Line((-29, 2), (-29, 0))
            Line((-29, 0), (-27, 0))
        make_face()
    extrude(amount=F3_T112_DEPTH)

    # F3_s113 → F3_t114 (cut, symmetric)
    with BuildSketch(Plane.XZ.offset(28)):
        with Locations((-11.5, 2)):
            Circle(F3_S113_R)
    extrude(amount=F3_T114_DEPTH, both=True, mode=Mode.SUBTRACT)


with BuildPart() as f1_15:
    add(f1_14.part)

    # F3_t109: cut F3_tool110
    add(f3_tool110.part, mode=Mode.SUBTRACT)


with BuildPart() as f3_tool116:
    # F3_s117 → F3_t118 (new body)
    with BuildSketch(Plane.YZ.offset(-18.5)):
        with BuildLine():
            ThreePointArc((-27, 0), (-28.4142135624, 0.5857864376), (-29, 2))
            Line((-29, 2), (-29, 0))
            Line((-29, 0), (-27, 0))
        make_face()
    extrude(amount=F3_T118_DEPTH)

    # F3_s119 → F3_t120 (cut, symmetric)
    with BuildSketch(Plane.XZ.offset(28)):
        with Locations((-12.5, 2)):
            Circle(F3_S119_R)
    extrude(amount=F3_T120_DEPTH, both=True, mode=Mode.SUBTRACT)


with BuildPart() as f1_16:
    add(f1_15.part)

    # F3_t115: cut F3_tool116
    add(f3_tool116.part, mode=Mode.SUBTRACT)

    # F3_s121 → F3_t122 (revolve, cut)
    with BuildSketch(Plane.XZ.offset(24.49999)):
        with BuildLine():
            ThreePointArc((-12.5, 0), (-11.0857864376, 0.5857864376), (-10.5, 2))
            Line((-10.5, 2), (-10.5, 0))
            Line((-10.5, 0), (-12.5, 0))
        make_face()
    revolve(axis=Axis((-1e-05, -24.49999, 0), (0, 0, -1)), revolution_arc=F3_T122_ANGLE, mode=Mode.SUBTRACT)

    # F3_s123 → F3_t124 (revolve, cut)
    with BuildSketch(Plane.XZ):
        with BuildLine():
            ThreePointArc((13, 0), (11.5857864376, 0.5857864376), (11, 2))
            Line((11, 2), (11, 0))
            Line((11, 0), (13, 0))
        make_face()
    revolve(axis=Axis((0, 0, 0), (0, 0, 1)), mode=Mode.SUBTRACT)


solid = f1_16.part
